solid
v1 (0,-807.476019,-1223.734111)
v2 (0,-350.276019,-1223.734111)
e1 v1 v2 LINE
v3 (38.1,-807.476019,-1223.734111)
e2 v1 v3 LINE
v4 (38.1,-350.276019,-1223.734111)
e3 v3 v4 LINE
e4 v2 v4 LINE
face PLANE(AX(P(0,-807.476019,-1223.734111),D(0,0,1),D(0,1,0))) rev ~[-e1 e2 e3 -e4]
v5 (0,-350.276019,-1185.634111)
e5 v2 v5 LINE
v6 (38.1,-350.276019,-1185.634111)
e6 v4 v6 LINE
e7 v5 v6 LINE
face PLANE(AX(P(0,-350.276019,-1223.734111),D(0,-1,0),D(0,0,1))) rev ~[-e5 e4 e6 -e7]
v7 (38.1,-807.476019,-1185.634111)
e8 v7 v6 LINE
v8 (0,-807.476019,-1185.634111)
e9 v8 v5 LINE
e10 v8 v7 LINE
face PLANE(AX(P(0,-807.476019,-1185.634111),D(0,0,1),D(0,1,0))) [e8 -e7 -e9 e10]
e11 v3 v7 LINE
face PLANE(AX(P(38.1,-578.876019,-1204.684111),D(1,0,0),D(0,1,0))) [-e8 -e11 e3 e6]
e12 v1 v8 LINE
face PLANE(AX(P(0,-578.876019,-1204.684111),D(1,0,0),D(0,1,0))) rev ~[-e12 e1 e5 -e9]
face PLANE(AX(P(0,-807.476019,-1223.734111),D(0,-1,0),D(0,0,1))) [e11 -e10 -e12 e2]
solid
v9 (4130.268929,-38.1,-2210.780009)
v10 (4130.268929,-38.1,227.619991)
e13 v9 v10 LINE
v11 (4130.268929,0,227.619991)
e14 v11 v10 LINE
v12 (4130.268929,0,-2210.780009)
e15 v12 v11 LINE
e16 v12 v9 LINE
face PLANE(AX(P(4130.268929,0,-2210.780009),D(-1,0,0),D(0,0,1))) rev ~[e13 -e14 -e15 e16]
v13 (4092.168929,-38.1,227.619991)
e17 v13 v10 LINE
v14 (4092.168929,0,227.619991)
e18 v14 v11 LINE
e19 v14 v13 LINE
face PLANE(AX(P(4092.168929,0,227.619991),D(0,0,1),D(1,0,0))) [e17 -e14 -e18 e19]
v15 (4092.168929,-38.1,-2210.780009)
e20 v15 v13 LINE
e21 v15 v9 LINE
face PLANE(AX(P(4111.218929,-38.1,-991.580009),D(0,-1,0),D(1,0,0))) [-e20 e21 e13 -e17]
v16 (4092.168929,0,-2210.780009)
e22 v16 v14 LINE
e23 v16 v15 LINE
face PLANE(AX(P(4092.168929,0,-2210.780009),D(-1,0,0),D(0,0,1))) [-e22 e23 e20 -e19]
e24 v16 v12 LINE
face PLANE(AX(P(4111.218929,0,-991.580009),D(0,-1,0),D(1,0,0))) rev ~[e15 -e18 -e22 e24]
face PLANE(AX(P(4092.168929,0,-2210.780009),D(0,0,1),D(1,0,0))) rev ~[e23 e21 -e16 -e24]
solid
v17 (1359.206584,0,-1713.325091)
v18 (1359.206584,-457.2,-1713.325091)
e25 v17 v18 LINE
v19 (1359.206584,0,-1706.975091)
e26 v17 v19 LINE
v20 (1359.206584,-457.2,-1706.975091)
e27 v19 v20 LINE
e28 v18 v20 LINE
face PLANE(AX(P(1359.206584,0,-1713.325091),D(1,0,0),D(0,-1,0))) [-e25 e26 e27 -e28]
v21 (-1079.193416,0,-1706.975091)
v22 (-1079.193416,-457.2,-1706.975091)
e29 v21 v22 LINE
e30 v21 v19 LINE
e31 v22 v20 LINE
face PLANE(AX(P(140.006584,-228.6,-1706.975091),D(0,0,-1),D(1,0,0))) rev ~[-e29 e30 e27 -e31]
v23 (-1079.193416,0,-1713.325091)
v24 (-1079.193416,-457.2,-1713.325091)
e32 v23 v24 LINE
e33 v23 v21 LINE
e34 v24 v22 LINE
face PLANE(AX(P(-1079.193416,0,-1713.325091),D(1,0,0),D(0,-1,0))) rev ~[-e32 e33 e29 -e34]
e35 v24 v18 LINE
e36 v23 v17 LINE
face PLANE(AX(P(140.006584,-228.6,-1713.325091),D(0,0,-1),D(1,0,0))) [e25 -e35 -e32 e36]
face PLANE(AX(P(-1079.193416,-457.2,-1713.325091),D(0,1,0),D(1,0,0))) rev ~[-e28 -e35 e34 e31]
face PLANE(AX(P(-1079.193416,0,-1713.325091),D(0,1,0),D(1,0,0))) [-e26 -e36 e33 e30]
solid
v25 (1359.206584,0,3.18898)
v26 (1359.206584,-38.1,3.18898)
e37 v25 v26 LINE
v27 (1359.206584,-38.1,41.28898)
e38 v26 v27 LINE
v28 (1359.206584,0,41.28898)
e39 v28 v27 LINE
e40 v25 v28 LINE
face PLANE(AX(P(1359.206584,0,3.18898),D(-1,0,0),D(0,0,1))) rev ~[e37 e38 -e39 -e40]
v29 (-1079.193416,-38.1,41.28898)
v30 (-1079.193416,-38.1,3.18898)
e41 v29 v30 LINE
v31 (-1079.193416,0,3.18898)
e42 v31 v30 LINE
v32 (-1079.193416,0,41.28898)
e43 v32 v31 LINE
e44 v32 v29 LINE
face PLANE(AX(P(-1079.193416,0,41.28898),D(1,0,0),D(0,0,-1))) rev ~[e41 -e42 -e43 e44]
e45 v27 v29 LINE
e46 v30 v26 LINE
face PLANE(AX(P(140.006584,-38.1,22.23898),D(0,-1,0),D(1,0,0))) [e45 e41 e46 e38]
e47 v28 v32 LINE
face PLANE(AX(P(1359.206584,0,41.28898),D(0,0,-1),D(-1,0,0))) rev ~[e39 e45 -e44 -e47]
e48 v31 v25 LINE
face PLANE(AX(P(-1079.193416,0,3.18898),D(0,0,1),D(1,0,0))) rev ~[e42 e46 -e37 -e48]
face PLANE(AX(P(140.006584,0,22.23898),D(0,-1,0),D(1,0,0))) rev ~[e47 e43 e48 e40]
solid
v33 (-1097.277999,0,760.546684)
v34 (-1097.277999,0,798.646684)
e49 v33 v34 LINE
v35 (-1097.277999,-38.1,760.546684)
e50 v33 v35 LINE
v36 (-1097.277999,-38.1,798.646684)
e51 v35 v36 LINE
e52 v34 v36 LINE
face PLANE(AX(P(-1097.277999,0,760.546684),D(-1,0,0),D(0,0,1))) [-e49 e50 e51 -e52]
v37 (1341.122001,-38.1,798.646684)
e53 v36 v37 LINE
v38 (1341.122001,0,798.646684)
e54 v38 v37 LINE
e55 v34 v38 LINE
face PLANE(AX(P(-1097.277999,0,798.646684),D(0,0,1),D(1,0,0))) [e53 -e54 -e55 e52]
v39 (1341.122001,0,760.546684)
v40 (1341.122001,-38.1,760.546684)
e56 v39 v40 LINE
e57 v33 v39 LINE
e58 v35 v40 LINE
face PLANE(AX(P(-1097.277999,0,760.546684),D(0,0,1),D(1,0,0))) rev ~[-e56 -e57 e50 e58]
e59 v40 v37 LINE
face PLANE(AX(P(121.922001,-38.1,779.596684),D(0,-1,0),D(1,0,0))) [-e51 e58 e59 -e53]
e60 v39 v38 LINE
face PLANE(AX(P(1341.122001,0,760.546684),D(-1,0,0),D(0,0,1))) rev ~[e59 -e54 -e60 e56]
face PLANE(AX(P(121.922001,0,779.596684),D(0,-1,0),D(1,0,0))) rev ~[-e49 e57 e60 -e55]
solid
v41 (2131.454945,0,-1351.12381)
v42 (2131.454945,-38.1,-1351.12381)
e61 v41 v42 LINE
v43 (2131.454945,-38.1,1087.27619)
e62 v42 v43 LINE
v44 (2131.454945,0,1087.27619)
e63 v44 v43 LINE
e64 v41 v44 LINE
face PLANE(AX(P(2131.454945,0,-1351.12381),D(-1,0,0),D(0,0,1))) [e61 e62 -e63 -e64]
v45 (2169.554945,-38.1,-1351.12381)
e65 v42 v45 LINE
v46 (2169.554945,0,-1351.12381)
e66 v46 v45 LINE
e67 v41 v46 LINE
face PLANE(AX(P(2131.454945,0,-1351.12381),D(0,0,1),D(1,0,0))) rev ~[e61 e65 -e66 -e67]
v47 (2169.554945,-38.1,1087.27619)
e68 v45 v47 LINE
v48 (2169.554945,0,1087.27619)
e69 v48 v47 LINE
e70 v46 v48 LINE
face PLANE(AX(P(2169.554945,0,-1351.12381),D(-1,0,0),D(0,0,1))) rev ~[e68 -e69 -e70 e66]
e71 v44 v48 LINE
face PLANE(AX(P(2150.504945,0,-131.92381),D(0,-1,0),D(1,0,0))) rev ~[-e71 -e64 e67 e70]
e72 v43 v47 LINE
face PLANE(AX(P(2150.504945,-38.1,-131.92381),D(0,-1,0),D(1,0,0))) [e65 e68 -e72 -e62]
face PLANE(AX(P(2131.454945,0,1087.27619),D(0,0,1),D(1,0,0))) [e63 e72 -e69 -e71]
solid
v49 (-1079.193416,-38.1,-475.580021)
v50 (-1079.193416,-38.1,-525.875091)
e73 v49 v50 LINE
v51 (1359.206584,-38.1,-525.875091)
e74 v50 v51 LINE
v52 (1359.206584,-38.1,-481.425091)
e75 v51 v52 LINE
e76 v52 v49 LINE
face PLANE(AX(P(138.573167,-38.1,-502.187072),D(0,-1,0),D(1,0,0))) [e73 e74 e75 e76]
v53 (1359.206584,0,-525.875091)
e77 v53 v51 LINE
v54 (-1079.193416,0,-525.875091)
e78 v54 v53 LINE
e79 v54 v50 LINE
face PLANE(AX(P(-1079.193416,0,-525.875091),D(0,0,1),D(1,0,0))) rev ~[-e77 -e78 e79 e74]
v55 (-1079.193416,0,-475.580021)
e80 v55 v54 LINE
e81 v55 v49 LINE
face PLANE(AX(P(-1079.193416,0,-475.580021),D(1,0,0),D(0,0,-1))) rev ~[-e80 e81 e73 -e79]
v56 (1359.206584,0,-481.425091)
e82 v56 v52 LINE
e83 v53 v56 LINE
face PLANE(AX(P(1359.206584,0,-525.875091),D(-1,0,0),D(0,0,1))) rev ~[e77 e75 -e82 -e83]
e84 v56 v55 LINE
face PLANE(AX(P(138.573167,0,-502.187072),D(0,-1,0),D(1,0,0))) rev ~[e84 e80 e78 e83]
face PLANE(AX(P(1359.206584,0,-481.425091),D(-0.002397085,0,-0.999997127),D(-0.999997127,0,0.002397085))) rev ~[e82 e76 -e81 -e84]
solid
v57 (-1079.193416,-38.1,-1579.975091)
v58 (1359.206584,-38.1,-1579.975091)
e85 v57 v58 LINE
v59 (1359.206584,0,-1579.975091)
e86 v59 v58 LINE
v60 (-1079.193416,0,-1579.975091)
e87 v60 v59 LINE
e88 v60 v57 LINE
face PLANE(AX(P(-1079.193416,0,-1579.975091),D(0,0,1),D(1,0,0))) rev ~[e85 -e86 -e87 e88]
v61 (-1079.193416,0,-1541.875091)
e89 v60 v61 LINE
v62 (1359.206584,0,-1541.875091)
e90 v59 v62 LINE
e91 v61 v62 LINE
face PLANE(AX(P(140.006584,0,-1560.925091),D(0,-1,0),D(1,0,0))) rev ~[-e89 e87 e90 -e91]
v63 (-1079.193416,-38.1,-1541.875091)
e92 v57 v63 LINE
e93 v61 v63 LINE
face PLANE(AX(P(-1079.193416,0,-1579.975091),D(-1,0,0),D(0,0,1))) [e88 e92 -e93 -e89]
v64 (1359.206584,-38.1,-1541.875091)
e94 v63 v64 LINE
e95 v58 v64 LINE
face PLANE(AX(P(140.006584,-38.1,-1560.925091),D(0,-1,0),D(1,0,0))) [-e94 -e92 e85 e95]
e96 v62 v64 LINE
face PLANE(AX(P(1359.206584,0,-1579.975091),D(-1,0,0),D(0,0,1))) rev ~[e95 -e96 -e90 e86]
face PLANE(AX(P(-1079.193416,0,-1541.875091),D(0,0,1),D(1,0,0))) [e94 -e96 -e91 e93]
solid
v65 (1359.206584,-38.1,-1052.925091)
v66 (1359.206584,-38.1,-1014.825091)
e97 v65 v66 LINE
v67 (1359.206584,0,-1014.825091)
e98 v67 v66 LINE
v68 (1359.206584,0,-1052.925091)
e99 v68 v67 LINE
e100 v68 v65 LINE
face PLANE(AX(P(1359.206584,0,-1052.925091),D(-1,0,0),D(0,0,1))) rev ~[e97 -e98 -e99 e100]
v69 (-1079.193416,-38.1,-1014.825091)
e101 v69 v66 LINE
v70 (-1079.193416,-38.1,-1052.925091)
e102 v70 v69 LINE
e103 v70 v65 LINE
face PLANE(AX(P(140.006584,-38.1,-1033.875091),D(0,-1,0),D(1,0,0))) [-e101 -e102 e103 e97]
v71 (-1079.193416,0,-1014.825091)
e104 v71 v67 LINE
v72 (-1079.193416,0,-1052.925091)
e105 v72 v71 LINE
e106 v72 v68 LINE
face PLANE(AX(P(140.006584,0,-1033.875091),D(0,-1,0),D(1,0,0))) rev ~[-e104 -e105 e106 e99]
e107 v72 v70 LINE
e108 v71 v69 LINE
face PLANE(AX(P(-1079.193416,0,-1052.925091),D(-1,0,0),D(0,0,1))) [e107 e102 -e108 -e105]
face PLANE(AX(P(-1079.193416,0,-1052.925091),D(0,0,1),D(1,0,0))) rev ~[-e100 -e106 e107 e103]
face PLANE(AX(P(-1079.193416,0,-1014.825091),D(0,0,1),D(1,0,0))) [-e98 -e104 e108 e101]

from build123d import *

# Parameters (mm, degrees)
F0_W      = 2438.4
F0_H      = 38.1
F1_DEPTH  = 38.1
F0_W_2    = 38.1
F0_H_2    = 2438.4
F2_DEPTH  = 38.1
F3_DEPTH  = 38.1
F4_DEPTH  = 38.1
F5_DEPTH  = 38.1
F6_DEPTH  = 38.1
F7_E6_W   = 2438.4
F7_E6_H   = 457.2
F8_DEPTH  = 6.35
F9_DEPTH  = 38.1
F10_W     = 457.2
F10_H     = 38.1
F11_DEPTH = 38.1


with BuildPart() as f1:
    # F0 (on Front) → F1 (new body)
    with BuildSketch(Plane.XZ):
        with Locations((121.9220010757, 779.5966842651)):
            Rectangle(F0_W, F0_H)
    extrude(amount=F1_DEPTH)


with BuildPart() as f2:
    # F0 (on Front) → F2 (new body)
    with BuildSketch(Plane.XZ):
        with Locations((2150.5049446106, -131.9238098145)):
            Rectangle(F0_W_2, F0_H_2)
    extrude(amount=F2_DEPTH)


with BuildPart() as f3:
    # F0 (on Front) → F3 (new body)
    with BuildSketch(Plane.XZ):
        with Locations((140.006583941, -1560.925090957)):
            Rectangle(F0_W, F0_H)
    extrude(amount=F3_DEPTH)


with BuildPart() as f4:
    # F0 (on Front) → F4 (new body)
    with BuildSketch(Plane.XZ):
        with Locations((140.006583941, -1033.875090957)):
            Rectangle(F0_W, F0_H)
    extrude(amount=F4_DEPTH)


with BuildPart() as f5:
    # F0 (on Front) → F5 (new body)
    with BuildSketch(Plane.XZ):
        Polygon((1359.206583941, 7.0199789283), (1359.206583941, 41.2889796493), (-1079.193416059, 41.2889796493), (-1079.193416059, 13.3699789283), (-1079.193416059, 3.1889796493), (1359.206583941, 3.1889796493), align=None)
    extrude(amount=F5_DEPTH)


with BuildPart() as f6:
    # F0 (on Front) → F6 (new body)
    with BuildSketch(Plane.XZ):
        Polygon((1359.206583941, -525.875090957), (1359.206583941, -481.425090957), (-1079.193416059, -475.5800210717), (-1079.193416059, -525.875090957), align=None)
    extrude(amount=F6_DEPTH)


with BuildPart() as f8:
    # F7_E6 (on explicit) → F8 (new body)
    with BuildSketch(Plane(origin=(-1079.193416059, 0, -1713.325090957), x_dir=(1, 0, 0), z_dir=(0, 0, -1))):
        with Locations((1219.2, 228.6)):
            Rectangle(F7_E6_W, F7_E6_H)
    extrude(amount=-F8_DEPTH)


with BuildPart() as f9:
    # F0 (on Front) → F9 (new body)
    with BuildSketch(Plane.XZ):
        with Locations((4111.2189292908, -991.5800094604)):
            Rectangle(F0_W_2, F0_H_2)
    extrude(amount=F9_DEPTH)


with BuildPart() as f11:
    # F10 (on Right) → F11 (new body)
    with BuildSketch(Plane.YZ):
        with Locations((-578.8760185242, -1204.6841109155)):
            Rectangle(F10_W, F10_H)
    extrude(amount=F11_DEPTH)


solid = Compound([f1.part, f2.part, f3.part, f4.part, f5.part, f6.part, f8.part, f9.part, f11.part])
